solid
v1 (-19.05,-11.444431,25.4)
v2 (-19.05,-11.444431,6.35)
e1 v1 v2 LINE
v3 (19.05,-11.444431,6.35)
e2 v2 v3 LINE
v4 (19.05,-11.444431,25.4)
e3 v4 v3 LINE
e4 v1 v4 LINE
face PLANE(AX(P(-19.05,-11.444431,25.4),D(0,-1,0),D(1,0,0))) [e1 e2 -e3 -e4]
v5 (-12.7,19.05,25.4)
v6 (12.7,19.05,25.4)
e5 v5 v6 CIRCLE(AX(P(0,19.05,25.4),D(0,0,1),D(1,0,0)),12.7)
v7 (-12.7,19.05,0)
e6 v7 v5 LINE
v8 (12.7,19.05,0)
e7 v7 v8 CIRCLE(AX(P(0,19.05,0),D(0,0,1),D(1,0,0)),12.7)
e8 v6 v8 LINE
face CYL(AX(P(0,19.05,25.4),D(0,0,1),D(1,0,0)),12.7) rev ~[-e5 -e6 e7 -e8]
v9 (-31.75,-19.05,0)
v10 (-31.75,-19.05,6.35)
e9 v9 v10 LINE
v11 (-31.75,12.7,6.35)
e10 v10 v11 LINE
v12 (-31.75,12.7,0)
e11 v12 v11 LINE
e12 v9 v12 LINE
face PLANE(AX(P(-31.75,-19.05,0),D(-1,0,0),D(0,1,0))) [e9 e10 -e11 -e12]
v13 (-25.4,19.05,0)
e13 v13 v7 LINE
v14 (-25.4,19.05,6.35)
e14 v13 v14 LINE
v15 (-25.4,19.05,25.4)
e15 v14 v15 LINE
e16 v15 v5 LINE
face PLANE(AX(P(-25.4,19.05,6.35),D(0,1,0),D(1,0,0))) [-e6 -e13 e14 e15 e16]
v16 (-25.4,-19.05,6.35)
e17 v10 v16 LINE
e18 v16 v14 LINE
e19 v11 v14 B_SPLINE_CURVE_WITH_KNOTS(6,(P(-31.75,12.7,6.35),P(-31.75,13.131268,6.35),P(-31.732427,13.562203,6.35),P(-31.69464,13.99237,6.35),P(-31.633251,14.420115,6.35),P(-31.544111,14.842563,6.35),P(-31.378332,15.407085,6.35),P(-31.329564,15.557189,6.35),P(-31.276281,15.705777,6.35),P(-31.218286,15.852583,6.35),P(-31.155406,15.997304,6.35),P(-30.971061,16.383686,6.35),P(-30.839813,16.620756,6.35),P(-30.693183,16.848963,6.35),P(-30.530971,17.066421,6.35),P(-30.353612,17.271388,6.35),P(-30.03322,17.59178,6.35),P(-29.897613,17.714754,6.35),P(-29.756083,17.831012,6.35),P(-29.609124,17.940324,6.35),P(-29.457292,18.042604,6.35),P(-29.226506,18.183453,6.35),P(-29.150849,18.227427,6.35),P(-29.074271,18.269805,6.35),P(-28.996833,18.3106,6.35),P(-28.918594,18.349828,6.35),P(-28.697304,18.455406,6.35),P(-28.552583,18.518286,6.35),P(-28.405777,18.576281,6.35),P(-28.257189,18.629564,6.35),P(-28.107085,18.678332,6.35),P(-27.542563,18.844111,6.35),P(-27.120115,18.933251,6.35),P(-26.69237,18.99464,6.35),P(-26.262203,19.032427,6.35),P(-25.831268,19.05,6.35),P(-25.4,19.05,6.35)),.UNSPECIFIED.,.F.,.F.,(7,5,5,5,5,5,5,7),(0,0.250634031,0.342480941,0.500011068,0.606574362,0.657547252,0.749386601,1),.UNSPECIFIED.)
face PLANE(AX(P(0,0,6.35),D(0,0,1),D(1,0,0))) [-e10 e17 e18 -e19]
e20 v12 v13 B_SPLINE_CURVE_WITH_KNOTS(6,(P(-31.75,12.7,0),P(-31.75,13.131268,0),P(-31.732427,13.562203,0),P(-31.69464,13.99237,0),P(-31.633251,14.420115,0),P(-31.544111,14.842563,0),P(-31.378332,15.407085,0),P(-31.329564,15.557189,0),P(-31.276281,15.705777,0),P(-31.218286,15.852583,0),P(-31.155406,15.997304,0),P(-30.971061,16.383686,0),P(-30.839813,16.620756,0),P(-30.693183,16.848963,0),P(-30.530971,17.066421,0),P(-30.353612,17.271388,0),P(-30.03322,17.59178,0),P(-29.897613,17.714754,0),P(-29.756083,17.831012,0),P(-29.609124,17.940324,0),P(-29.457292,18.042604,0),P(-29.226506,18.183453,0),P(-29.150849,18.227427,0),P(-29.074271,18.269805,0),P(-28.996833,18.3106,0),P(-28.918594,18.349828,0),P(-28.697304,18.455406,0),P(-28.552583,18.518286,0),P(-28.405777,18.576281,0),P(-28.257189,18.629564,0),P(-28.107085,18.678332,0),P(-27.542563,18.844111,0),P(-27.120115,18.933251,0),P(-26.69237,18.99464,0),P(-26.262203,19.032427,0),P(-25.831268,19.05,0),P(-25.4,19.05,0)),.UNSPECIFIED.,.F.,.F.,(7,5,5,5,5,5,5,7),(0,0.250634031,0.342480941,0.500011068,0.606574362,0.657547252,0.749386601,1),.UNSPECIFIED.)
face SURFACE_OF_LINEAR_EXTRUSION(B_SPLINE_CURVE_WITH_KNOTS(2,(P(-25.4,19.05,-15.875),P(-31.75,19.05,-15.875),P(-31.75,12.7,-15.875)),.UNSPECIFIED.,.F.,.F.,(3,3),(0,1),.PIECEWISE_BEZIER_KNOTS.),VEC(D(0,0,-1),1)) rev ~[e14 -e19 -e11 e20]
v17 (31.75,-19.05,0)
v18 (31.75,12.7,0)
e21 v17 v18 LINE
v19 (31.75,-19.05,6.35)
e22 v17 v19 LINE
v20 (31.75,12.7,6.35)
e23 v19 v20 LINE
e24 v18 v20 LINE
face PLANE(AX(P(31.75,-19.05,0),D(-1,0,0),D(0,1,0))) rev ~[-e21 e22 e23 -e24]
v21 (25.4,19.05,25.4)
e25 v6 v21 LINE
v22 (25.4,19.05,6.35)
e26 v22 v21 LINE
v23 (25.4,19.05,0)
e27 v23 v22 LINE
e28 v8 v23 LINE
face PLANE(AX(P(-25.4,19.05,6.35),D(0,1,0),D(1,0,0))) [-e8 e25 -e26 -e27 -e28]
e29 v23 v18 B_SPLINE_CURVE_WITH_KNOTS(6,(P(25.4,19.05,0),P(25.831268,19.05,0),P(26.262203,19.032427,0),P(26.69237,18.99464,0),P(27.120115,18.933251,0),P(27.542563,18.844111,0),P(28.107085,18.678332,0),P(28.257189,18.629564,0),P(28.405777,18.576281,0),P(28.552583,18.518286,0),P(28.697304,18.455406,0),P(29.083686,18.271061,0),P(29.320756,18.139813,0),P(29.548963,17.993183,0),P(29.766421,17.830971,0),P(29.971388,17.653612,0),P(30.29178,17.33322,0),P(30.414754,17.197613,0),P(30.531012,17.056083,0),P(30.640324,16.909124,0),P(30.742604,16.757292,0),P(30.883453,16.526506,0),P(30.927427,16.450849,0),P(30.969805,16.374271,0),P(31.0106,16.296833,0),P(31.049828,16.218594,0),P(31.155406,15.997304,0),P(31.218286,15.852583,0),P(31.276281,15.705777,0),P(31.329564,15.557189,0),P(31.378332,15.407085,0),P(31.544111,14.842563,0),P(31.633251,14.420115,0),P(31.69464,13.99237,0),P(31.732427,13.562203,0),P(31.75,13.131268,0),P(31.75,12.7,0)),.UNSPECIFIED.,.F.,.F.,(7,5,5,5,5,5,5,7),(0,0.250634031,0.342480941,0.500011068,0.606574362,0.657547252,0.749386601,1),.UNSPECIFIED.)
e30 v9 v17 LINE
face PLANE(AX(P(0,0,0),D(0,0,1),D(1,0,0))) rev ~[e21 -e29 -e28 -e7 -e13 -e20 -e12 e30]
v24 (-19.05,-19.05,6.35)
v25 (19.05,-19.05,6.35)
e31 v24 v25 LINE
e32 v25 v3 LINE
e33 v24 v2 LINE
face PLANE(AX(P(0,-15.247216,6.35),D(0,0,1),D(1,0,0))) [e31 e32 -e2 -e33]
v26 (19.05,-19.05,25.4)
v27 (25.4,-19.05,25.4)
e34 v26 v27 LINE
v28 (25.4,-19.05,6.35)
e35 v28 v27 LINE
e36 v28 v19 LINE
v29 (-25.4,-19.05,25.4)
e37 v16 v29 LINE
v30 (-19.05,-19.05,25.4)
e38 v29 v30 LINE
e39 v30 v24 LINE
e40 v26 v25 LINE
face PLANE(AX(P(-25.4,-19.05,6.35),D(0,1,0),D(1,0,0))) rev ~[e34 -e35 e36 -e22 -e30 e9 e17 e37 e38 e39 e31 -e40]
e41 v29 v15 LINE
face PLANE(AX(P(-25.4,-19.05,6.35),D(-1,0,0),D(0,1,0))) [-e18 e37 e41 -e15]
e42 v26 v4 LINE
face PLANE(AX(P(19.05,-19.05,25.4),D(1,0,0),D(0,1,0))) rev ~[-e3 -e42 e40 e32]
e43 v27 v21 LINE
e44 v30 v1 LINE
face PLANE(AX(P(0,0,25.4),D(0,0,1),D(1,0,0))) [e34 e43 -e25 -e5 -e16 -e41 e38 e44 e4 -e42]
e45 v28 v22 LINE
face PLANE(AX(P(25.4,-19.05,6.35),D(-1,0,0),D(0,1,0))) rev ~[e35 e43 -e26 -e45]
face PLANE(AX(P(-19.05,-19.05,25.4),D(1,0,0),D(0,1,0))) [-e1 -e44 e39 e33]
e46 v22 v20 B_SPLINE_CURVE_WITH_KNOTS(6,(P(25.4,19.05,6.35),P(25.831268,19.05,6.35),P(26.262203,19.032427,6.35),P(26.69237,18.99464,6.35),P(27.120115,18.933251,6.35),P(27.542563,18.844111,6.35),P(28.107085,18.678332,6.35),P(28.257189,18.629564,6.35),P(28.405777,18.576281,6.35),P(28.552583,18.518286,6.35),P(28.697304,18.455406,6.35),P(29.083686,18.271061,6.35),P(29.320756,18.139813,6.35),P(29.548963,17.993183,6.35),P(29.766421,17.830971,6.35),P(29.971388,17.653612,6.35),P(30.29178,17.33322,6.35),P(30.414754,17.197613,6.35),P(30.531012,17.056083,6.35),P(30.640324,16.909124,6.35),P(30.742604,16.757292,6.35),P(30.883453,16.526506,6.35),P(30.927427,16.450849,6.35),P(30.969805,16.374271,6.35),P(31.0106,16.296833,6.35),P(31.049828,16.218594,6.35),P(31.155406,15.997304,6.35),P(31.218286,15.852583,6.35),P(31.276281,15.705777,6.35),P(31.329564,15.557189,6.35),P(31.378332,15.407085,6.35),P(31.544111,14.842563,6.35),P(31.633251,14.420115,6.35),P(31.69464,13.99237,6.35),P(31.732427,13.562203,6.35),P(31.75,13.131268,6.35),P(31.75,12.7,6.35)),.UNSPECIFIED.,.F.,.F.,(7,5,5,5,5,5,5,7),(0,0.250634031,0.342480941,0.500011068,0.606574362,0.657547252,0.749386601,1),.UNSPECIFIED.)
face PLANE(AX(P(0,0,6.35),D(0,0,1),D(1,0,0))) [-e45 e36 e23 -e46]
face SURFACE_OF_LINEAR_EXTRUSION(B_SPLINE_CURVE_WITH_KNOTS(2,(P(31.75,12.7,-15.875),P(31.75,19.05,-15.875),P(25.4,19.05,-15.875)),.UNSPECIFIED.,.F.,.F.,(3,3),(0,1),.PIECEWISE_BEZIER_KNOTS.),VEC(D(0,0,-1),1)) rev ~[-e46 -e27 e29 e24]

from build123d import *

# Parameters (mm, degrees)
F0_W        = 63.5
F0_H        = 38.1
F1_DEPTH    = 6.35
F2_T1_DEPTH = 38.1
F3_W        = 50.8
F3_H        = 38.1
F4_DEPTH    = 19.05
F5_W        = 38.1
F5_H        = 7.6055689663
F6_DEPTH    = 19.05
F7_R        = 12.7
F8_DEPTH    = 25.4


# Not quite as in the source:
# - a fillet or chamfer that OpenCascade refuses, or shapes differently, is made with other operations: its cross-section is extruded or revolved along the edge and cut away or added


with BuildPart() as f1:
    # F0 (on Top) → F1 (new body)
    with BuildSketch(Plane.XY):
        Rectangle(F0_W, F0_H)
    extrude(amount=F1_DEPTH)

    # F2: fillet of radius 6.35 on 2 edges, made by hand

    # F2_s2 → F2_t1 (cut)
    with BuildSketch(Plane.XY.offset(-15.875)):
        with BuildLine():
            add(Edge.make_bspline(
                [(-25.4, 19.05), (-31.75, 19.05), (-31.75, 12.7)],
                knots=[0, 0, 0, 1, 1, 1], degree=2, weights=[1, 1, 1]))
            Line((-31.75, 12.7), (-31.75, 19.05))
            Line((-31.75, 19.05), (-25.4, 19.05))
        make_face()
        with BuildLine():
            add(Edge.make_bspline(
                [(31.75, 12.7), (31.75, 19.05), (25.4, 19.05)],
                knots=[0, 0, 0, 1, 1, 1], degree=2, weights=[1, 1, 1]))
            Line((25.4, 19.05), (31.75, 19.05))
            Line((31.75, 19.05), (31.75, 12.7))
        make_face()
    extrude(amount=F2_T1_DEPTH, mode=Mode.SUBTRACT)

    # F3 (on face) → F4 (join)
    with BuildSketch(Plane.XY.offset(6.35)):
        Rectangle(F3_W, F3_H)
    extrude(amount=F4_DEPTH)

    # F5 (on face) → F6 (cut)
    with BuildSketch(Plane.XY.offset(25.4)):
        with Locations((0, -15.2472155169)):
            Rectangle(F5_W, F5_H)
    extrude(amount=-F6_DEPTH, mode=Mode.SUBTRACT)

    # F7 (on face) → F8 (cut)
    with BuildSketch(Plane.XY.offset(25.4)):
        with Locations((0, 19.05)):
            Circle(F7_R)
    extrude(amount=-F8_DEPTH, mode=Mode.SUBTRACT)


solid = f1.part
